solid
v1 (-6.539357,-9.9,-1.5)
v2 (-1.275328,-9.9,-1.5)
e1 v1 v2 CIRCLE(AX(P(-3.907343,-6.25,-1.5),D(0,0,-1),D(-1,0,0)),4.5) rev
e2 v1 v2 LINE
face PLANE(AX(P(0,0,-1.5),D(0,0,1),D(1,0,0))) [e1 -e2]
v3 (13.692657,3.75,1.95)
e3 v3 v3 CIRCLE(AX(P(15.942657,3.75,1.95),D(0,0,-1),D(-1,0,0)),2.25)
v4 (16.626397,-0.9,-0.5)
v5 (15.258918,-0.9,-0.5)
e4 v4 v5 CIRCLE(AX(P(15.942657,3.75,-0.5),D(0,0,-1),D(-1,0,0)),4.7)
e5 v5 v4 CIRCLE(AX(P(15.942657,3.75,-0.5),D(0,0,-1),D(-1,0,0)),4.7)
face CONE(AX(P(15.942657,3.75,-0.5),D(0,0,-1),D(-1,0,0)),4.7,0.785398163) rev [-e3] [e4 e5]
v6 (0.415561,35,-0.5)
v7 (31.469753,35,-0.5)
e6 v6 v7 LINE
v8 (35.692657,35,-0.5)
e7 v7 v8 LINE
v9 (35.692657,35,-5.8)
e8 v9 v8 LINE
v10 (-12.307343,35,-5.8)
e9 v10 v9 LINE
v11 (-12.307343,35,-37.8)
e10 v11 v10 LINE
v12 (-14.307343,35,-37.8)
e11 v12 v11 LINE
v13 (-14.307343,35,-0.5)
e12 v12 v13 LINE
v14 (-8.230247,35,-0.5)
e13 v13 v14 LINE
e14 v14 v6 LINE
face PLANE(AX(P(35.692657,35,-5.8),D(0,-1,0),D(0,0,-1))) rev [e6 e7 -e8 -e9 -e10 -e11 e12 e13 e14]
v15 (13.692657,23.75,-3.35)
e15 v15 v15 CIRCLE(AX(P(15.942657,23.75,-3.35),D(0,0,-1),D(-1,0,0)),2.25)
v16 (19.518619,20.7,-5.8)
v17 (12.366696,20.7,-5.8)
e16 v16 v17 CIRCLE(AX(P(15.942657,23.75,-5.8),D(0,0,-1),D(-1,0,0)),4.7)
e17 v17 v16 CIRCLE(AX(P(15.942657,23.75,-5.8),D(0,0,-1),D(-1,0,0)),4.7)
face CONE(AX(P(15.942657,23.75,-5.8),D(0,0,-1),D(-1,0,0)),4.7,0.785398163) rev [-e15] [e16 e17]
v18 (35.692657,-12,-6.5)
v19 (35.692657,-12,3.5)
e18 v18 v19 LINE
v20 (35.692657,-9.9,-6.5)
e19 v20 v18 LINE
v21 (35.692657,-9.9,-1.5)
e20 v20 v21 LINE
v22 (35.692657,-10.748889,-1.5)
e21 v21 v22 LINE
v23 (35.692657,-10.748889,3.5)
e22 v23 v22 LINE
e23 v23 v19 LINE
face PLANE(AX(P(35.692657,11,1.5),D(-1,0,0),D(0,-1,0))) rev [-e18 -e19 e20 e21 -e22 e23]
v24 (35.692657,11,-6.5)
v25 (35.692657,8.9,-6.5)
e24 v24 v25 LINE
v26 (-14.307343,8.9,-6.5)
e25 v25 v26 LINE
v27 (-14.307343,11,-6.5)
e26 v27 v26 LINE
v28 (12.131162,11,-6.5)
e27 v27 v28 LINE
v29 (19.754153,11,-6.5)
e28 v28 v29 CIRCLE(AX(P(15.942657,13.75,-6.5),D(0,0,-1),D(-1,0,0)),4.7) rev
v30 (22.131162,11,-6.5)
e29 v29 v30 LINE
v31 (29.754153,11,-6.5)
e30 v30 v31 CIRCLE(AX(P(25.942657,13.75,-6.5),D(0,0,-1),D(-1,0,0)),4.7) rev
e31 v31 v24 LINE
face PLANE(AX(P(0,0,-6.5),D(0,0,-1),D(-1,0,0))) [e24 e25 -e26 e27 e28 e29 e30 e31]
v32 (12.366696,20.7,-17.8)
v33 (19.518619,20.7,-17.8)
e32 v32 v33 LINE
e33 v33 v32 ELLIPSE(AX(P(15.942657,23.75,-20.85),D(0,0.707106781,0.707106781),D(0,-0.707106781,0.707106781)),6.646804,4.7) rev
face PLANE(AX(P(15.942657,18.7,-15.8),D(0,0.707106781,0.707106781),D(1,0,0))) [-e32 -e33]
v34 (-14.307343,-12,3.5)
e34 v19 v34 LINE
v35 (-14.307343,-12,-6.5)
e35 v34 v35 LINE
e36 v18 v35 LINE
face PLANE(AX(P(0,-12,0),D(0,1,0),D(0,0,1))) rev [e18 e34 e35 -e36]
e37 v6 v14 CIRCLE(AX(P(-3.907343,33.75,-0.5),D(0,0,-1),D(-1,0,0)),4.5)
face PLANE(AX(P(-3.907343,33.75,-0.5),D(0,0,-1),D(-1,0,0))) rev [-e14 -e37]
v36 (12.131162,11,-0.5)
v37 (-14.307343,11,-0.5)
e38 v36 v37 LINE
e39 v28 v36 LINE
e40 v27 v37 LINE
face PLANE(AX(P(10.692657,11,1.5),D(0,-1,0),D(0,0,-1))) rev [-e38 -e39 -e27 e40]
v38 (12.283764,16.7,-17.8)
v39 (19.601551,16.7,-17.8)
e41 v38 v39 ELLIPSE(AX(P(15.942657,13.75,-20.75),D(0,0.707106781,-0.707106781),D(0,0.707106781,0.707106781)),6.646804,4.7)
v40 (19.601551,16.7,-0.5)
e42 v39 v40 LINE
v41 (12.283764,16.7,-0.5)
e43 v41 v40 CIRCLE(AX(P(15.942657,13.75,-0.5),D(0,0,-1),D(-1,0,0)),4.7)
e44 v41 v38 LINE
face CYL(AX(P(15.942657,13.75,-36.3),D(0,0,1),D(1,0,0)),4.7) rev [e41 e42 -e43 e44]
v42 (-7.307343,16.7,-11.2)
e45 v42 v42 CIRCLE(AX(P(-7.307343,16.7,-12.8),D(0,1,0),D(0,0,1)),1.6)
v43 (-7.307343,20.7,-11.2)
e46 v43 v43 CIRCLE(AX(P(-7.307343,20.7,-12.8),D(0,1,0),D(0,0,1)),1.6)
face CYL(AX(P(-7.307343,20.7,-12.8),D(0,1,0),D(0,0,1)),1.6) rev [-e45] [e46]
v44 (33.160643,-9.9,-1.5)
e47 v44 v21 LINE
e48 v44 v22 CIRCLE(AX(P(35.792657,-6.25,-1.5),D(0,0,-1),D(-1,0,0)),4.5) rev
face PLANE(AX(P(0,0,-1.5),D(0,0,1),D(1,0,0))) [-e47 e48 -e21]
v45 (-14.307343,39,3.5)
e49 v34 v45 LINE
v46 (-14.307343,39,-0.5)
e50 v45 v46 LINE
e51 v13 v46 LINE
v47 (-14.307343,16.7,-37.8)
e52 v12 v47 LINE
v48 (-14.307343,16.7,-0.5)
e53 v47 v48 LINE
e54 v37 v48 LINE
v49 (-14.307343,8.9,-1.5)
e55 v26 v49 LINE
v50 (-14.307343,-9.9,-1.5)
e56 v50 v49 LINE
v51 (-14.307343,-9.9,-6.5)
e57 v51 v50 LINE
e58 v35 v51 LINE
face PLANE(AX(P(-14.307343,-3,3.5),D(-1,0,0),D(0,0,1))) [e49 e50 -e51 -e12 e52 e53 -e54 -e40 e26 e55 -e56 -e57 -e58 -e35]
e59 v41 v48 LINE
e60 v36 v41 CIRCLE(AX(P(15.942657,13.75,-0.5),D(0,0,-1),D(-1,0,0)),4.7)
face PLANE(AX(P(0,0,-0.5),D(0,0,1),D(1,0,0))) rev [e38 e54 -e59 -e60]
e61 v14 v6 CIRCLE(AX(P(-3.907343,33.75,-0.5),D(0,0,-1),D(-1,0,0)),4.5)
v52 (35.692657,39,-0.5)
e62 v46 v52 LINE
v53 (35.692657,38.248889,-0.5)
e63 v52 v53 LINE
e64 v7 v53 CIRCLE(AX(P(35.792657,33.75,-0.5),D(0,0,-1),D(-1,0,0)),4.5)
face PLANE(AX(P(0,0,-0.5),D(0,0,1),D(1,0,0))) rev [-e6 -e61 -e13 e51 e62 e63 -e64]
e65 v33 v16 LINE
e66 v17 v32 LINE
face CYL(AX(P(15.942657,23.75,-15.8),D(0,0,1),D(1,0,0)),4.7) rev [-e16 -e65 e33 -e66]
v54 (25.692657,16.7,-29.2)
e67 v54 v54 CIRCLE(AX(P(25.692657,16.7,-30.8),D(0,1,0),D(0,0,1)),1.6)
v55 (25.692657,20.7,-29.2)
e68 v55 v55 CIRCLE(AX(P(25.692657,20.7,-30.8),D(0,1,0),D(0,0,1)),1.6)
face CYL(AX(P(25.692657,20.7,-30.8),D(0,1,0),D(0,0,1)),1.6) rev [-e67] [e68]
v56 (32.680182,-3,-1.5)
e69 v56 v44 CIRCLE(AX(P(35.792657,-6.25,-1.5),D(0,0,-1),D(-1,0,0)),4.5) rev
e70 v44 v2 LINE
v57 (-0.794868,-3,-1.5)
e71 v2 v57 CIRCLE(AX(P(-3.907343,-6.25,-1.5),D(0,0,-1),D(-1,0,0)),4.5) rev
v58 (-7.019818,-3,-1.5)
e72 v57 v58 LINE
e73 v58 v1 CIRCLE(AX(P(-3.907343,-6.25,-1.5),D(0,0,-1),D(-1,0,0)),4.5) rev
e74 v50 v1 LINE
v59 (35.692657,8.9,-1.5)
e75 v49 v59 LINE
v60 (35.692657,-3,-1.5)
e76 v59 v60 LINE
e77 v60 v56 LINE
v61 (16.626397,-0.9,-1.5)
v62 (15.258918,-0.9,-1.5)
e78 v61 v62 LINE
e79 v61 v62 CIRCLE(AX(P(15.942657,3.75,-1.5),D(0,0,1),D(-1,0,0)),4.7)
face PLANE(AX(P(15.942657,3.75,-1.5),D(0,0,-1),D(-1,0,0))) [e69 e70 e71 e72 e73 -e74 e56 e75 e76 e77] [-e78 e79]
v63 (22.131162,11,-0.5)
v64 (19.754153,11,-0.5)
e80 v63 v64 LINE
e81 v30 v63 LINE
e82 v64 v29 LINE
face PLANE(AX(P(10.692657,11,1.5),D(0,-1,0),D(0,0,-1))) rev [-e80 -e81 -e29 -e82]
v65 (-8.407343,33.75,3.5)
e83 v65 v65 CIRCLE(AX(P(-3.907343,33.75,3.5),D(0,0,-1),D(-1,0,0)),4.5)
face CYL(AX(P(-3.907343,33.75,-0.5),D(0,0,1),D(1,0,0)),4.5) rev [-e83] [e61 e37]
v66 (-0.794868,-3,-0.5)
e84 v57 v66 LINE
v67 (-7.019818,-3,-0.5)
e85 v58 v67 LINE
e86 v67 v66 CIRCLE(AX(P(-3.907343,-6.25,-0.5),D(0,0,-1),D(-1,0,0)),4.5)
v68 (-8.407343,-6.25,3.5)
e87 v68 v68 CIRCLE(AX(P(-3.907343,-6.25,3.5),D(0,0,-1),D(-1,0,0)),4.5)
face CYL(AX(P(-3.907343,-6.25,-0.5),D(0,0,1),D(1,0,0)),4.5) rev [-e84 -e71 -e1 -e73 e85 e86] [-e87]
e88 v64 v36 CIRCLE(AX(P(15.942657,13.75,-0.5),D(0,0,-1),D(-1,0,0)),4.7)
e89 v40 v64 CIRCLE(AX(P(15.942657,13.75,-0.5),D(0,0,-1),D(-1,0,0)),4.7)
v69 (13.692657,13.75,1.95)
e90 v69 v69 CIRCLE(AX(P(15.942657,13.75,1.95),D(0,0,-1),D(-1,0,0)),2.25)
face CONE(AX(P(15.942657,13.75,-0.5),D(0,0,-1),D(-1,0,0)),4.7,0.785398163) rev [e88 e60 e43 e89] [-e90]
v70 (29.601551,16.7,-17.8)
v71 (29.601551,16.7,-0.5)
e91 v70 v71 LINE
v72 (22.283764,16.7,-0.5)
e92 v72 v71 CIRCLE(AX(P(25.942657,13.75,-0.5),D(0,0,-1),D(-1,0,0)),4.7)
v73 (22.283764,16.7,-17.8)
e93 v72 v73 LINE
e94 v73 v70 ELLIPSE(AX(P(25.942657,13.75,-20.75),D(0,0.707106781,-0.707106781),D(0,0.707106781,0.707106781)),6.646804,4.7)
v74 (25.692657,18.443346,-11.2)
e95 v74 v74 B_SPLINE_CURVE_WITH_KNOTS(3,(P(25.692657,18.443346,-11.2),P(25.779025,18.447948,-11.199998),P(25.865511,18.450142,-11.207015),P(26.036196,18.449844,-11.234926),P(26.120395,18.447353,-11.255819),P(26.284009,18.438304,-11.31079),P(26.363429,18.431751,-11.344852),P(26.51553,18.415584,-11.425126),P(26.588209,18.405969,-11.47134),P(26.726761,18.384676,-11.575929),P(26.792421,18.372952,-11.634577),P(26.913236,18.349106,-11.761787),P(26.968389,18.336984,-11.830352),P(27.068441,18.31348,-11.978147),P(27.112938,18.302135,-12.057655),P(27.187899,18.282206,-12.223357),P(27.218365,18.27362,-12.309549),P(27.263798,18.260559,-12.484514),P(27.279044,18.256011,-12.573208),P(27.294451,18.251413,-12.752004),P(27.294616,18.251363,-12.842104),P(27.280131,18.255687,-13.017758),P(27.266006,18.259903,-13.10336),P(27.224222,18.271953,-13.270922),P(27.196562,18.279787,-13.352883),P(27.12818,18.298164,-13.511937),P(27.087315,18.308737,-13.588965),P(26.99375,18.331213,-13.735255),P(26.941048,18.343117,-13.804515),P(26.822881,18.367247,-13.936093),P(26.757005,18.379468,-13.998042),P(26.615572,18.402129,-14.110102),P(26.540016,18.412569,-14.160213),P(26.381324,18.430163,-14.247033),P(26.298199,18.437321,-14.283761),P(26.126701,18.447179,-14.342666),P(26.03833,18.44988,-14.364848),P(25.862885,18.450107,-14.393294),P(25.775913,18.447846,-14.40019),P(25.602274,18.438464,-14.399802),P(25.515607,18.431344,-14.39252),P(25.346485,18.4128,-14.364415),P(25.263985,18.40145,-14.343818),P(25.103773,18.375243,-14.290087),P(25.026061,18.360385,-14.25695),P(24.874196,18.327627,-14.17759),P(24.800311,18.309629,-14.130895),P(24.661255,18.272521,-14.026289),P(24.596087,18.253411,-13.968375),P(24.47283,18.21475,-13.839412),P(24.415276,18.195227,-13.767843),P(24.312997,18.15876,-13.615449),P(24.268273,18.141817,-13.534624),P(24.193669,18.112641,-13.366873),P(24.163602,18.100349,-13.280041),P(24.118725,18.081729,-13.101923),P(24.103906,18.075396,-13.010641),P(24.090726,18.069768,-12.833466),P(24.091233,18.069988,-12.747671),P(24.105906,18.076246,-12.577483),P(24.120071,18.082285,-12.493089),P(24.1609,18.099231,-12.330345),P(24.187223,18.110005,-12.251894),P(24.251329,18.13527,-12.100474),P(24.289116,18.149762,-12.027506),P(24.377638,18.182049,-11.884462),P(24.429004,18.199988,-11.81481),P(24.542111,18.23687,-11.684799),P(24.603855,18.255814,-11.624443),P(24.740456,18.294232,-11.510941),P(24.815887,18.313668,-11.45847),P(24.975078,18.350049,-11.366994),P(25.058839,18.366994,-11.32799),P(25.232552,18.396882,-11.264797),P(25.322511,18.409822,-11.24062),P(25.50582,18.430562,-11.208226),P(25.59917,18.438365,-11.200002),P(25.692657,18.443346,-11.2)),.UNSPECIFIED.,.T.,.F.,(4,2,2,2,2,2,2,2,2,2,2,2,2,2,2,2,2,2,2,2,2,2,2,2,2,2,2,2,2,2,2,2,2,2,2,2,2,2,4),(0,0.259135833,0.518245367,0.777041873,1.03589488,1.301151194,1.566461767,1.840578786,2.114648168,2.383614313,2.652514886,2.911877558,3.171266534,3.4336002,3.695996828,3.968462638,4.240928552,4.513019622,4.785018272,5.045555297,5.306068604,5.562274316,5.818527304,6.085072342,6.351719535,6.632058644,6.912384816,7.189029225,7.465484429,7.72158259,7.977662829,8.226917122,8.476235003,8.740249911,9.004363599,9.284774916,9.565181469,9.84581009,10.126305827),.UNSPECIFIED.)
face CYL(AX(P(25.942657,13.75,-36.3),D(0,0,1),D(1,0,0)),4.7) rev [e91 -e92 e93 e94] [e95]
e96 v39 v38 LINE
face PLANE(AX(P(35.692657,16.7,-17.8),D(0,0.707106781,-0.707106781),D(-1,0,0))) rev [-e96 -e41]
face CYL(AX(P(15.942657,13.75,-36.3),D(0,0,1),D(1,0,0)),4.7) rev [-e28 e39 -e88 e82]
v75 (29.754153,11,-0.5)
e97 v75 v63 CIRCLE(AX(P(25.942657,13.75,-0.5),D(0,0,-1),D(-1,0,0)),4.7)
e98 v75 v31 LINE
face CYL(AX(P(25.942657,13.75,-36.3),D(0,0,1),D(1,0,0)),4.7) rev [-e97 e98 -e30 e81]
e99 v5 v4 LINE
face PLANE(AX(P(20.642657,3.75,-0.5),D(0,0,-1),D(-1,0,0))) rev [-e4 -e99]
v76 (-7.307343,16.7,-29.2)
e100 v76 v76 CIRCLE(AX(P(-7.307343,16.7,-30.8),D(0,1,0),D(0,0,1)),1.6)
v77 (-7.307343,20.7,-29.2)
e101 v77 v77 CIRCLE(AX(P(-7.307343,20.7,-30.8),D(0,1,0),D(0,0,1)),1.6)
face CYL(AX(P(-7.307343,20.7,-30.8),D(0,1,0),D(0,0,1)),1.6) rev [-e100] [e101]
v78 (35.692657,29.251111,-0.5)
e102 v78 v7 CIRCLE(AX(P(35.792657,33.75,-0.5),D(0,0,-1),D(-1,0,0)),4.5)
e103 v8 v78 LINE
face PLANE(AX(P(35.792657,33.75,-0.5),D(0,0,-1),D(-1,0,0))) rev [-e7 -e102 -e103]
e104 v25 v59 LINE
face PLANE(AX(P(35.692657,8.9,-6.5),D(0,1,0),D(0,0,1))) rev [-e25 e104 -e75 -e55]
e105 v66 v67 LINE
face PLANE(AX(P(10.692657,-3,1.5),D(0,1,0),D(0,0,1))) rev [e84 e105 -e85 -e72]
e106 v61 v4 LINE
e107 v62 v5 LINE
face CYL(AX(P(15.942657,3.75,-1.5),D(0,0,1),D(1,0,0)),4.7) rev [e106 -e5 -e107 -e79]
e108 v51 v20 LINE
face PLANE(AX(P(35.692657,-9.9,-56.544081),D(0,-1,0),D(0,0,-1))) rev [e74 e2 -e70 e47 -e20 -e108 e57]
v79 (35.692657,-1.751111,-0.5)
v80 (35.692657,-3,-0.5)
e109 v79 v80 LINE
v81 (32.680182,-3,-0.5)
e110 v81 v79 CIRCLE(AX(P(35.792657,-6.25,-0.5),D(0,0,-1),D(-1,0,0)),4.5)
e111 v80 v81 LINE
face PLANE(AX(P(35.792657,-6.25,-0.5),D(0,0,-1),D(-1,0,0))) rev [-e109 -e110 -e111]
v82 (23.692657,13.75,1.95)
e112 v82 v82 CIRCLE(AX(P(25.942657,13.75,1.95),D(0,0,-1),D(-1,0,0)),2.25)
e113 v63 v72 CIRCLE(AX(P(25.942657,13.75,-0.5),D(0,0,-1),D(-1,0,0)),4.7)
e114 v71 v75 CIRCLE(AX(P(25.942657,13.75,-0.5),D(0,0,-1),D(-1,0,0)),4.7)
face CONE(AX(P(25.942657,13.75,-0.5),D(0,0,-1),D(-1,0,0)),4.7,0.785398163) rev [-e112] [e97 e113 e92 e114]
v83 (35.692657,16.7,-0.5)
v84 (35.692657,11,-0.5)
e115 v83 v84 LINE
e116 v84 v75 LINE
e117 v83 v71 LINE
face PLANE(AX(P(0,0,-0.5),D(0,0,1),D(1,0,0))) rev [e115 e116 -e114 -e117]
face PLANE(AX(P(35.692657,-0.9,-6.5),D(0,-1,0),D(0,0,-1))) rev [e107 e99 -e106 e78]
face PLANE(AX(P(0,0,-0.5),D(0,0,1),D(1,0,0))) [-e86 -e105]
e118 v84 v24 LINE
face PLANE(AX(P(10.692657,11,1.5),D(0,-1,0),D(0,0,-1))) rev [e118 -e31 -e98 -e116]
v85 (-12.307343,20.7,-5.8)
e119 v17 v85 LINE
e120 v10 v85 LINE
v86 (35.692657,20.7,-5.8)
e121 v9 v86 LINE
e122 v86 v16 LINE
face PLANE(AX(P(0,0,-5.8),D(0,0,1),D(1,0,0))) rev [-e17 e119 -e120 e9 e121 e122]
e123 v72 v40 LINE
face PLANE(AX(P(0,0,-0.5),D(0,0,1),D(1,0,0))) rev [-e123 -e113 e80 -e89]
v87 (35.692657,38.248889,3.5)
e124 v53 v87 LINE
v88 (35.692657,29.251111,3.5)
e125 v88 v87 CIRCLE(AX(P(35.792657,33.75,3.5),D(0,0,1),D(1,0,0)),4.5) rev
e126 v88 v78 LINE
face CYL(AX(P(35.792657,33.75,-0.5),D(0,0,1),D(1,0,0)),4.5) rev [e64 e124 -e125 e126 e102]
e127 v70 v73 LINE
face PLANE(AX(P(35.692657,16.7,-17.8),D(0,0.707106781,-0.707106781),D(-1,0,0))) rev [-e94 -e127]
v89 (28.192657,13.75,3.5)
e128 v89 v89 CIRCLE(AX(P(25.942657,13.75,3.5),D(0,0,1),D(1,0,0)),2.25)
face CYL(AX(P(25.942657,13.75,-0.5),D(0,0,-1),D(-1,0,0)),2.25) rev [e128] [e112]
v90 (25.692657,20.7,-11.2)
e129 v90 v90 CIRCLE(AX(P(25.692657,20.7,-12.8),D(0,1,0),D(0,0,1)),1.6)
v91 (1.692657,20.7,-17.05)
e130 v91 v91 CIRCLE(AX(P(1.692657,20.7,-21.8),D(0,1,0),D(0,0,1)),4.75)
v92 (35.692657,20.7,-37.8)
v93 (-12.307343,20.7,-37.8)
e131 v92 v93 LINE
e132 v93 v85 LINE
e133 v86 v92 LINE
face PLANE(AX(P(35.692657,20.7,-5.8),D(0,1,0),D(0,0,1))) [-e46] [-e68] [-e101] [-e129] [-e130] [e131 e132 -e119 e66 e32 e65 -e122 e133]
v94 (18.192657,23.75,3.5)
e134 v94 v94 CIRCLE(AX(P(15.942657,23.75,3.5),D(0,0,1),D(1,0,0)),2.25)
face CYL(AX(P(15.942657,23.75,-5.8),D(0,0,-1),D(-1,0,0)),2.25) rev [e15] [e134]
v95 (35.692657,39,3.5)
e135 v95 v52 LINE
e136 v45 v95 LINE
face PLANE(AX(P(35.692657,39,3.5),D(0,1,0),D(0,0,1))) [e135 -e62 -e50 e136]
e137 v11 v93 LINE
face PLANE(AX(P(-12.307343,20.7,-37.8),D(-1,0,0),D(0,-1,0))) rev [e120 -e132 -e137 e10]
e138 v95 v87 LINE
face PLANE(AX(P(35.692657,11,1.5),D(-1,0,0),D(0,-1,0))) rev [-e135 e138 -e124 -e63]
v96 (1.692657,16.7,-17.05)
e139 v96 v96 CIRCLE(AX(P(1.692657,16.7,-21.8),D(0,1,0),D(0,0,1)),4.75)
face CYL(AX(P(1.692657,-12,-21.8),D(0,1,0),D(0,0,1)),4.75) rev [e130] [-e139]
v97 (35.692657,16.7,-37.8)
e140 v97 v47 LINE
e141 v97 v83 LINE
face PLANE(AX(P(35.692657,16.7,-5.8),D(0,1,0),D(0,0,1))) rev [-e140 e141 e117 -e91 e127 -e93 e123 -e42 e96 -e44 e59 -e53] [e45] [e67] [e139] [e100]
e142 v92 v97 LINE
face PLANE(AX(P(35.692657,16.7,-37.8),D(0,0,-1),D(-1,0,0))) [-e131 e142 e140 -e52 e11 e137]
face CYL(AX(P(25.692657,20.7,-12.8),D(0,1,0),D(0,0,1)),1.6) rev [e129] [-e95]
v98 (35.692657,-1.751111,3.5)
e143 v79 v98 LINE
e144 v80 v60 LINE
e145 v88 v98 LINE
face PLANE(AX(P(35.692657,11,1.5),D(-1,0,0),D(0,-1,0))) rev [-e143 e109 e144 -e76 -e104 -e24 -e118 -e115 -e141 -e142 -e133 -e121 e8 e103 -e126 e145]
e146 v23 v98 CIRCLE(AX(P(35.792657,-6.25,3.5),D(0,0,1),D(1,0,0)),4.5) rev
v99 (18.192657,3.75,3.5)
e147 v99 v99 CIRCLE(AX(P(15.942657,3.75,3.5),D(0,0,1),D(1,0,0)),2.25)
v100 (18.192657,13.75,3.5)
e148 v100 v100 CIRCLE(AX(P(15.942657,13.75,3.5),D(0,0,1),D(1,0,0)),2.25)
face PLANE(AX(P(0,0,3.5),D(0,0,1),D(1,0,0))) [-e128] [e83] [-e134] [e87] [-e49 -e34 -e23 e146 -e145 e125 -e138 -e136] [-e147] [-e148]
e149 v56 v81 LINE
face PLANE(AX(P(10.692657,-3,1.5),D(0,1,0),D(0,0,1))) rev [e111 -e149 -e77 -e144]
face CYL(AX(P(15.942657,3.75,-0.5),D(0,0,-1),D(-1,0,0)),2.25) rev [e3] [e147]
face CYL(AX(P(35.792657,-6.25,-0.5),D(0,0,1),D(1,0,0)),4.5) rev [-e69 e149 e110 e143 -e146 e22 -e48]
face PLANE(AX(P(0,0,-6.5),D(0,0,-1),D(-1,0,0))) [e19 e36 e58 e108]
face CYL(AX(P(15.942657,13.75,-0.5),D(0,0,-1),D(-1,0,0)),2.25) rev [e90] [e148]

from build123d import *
from build123d.topology import SkipClean

# Parameters (mm, degrees)
BOSS_EXTRUDE1_START       = 0.5
SKETCH1_W                 = 25
SKETCH1_H                 = 14
BOSS_EXTRUDE1_DEPTH       = 2
SKETCH2_W                 = 25
SKETCH2_H                 = 2.1
BOSS_EXTRUDE2_DEPTH       = 6
SKETCH3_W                 = 50
SKETCH3_H                 = 42
BOSS_EXTRUDE3_DEPTH       = 4
BOSS_EXTRUDE5_START       = -18.3
SKETCH4_2_R               = 1.5
BOSS_EXTRUDE5_DEPTH       = 4
SKETCH5_W                 = 50
SKETCH5_H                 = 18.3
BOSS_EXTRUDE6_DEPTH       = 5.3
SKETCH24_W                = 50
SKETCH24_H                = 4
BOSS_EXTRUDE13_DEPTH      = 9
SKETCH7_R                 = 4.5
CUT_EXTRUDE1_DEPTH        = 4
SKETCH9_W                 = 35.343646405
SKETCH9_H                 = 8.813303651
CUT_EXTRUDE3_DEPTH        = 10
SKETCH11_R                = 12.5
SKETCH11_R_2              = 1.5
SKETCH11_R_3              = 3.55
BOSS_EXTRUDE7_DEPTH       = 4
SKETCH12_R                = 12.5
BOSS_EXTRUDE8_DEPTH       = 14
SKETCH13_W                = 25
SKETCH13_H                = 2.1
BOSS_EXTRUDE9_DEPTH       = 6
CUT_EXTRUDE2_DEPTH        = 64.84830294
SKETCH14_W                = 9.591087042
SKETCH14_H                = 22.957747356
CUT_EXTRUDE4_DEPTH        = 70.083614523
SKETCH15_W                = 33.975925545
SKETCH15_H                = 18.244219276
CUT_EXTRUDE5_DEPTH        = 62.391693358
SKETCH16_W                = 32
SKETCH16_H                = 4
BOSS_EXTRUDE10_DEPTH      = 50
SKETCH18_W                = 2
SKETCH18_H                = 14.3
BOSS_EXTRUDE11_DEPTH      = 32
CUT_EXTRUDE6_DEPTH        = 62.41738995
F_1_0MM_DOWEL_HOLE1_D     = 3.2
F_1_0MM_DOWEL_HOLE1_DEPTH = 33.03862301
F_1_0MM_DOWEL_HOLE1_TIP   = 0.96137699
BOSS_EXTRUDE12_DEPTH      = 1
CUT_EXTRUDE7_DEPTH        = 10
CHAMFER1_SIZE             = 2
CUT_EXTRUDE8_DEPTH        = 10
BOSS_EXTRUDE14_DEPTH      = 1
SKETCH26_W                = 50
SKETCH26_H                = 2.1
BOSS_EXTRUDE15_DEPTH      = 5


# Read off the part's stored shape, not the designer's step: CSK for M4 Flat Head Machine Screw1
with BuildPart() as part:
    # Sketch1 → Boss-Extrude1 (new body)
    with BuildSketch(Plane.XY.offset(-1).offset(BOSS_EXTRUDE1_START)):
        with Locations((23.192657344, 4)):
            Rectangle(SKETCH1_W, SKETCH1_H)
    extrude(amount=BOSS_EXTRUDE1_DEPTH)

    # Sketch2 → Boss-Extrude2 (add)
    with BuildSketch(Plane(origin=(0, 0, -0.5), x_dir=(-1, 0, 0), z_dir=(0, 0, -1))):
        with Locations((-23.192657344, 9.95)):
            Rectangle(SKETCH2_W, SKETCH2_H)
        with Locations((-23.192657344, -1.95)):
            Rectangle(SKETCH2_W, SKETCH2_H)
    extrude(amount=BOSS_EXTRUDE2_DEPTH)

    # Sketch3 → Boss-Extrude3 (add)
    with BuildSketch(Plane(origin=(0, 0, -0.5), x_dir=(-1, 0, 0), z_dir=(0, 0, -1))):
        with Locations((-10.692657344, 18)):
            Rectangle(SKETCH3_W, SKETCH3_H)
    extrude(amount=-BOSS_EXTRUDE3_DEPTH)

    # Sketch4<2> → Boss-Extrude5 (add)
    with BuildSketch(Plane(origin=(0, 35, 0), x_dir=(1, 0, 0), z_dir=(0, 1, 0)).offset(BOSS_EXTRUDE5_START)):
        with BuildLine():
            Line((-1.349302764, 24.5), (-1.349302764, 0.5))
            Line((-1.349302764, 0.5), (8.650697236, 0.5))
            Line((8.650697236, 0.5), (8.650697236, 24.5))
            ThreePointArc((8.650697236, 24.5), (3.650697236, 29.5), (-1.349302764, 24.5))
        make_face()
        with Locations(Location((3.650697236, 7.5, 0), (0, 0, 270))):
            Circle(SKETCH4_2_R, mode=Mode.SUBTRACT)
        with Locations(Location((3.650697236, 24.5, 0), (0, 0, 270))):
            Circle(SKETCH4_2_R, mode=Mode.SUBTRACT)
    extrude(amount=-BOSS_EXTRUDE5_DEPTH)

    # Sketch5 → Boss-Extrude6 (add)
    with BuildSketch(Plane(origin=(0, 0, -0.5), x_dir=(-1, 0, 0), z_dir=(0, 0, -1))):
        with Locations((-10.692657344, 25.85)):
            Rectangle(SKETCH5_W, SKETCH5_H)
    extrude(amount=BOSS_EXTRUDE6_DEPTH)

    # CSK for M4 Flat Head Machine Screw1 outl → CSK for M4 Flat Head Machine Screw1 (revolve, cut)
    with BuildSketch(Plane(origin=(15.942657344, 23.75, 0), x_dir=(1, 0, 0), z_dir=(0, -1, 0))):
        Polygon((2.25, -3.35), (2.25, 3.5), (0, 3.5), (0, -5.8), (4.7, -5.8), align=None)
    revolve(axis=Axis((15.942657344, 23.75, 0), (0, 0, 1)), mode=Mode.SUBTRACT)

    # CSK for M4 Flat Head Machine Screw1 2 ou → CSK for M4 Flat Head Machine Screw1 2 (revolve, cut)
    with BuildSketch(Plane(origin=(15.942657344, 3.75, 0), x_dir=(1, 0, 0), z_dir=(0, -1, 0))):
        Polygon((4.7, -0.5), (2.25, 1.95), (2.25, 3.5), (0, 3.5), (0, -0.5), align=None)
    revolve(axis=Axis((15.942657344, 3.75, 0), (0, 0, 1)), mode=Mode.SUBTRACT)

    # CSK for M4 Flat Head Machine Screw1 3 ou → CSK for M4 Flat Head Machine Screw1 3 (revolve, cut)
    with BuildSketch(Plane(origin=(15.942657344, 13.75, 0), x_dir=(1, 0, 0), z_dir=(0, -1, 0))):
        Polygon((4.7, -0.5), (2.25, 1.95), (2.25, 3.5), (0, 3.5), (0, -0.5), align=None)
    revolve(axis=Axis((15.942657344, 13.75, 0), (0, 0, 1)), mode=Mode.SUBTRACT)

    # CSK for M4 Flat Head Machine Screw1 4 ou → CSK for M4 Flat Head Machine Screw1 4 (revolve, cut)
    with BuildSketch(Plane(origin=(25.942657344, 13.75, 0), x_dir=(1, 0, 0), z_dir=(0, -1, 0))):
        Polygon((2.25, 1.95), (2.25, 3.5), (0, 3.5), (0, -0.5), (4.7, -0.5), align=None)
    revolve(axis=Axis((25.942657344, 13.75, 0), (0, 0, 1)), mode=Mode.SUBTRACT)

    # Sketch24 → Boss-Extrude13 (add)
    with BuildSketch(Plane.XZ.offset(3)):
        with Locations((10.692657344, 1.5)):
            Rectangle(SKETCH24_W, SKETCH24_H)
    extrude(amount=BOSS_EXTRUDE13_DEPTH)

    # Sketch7 → Cut-Extrude1 (cut)
    with BuildSketch(Plane(origin=(0, 0, 3.5), x_dir=(-1, 0, 0), z_dir=(0, 0, -1))):
        with Locations((-35.792657344, 33.75)):
            Circle(SKETCH7_R)
        with Locations(Location((3.907342656, 33.75, 0), (0, 0, 163.872379787))):
            Circle(SKETCH7_R)
        with Locations((3.907342656, -6.25)):
            Circle(SKETCH7_R)
        with Locations((-35.792657344, -6.25)):
            Circle(SKETCH7_R)
    extrude(amount=CUT_EXTRUDE1_DEPTH, mode=Mode.SUBTRACT)

    # Sketch9 → Cut-Extrude3 (cut)
    with BuildSketch(Plane.ZY.offset(1.349302764)):
        with Locations((-18.171823203, 12.293348175)):
            Rectangle(SKETCH9_W, SKETCH9_H)
    extrude(amount=-CUT_EXTRUDE3_DEPTH, mode=Mode.SUBTRACT)

    # Sketch11 → Boss-Extrude7 (add)
    # profile 1 of 4: a face of its own
    with BuildSketch(Plane.XZ.offset(-16.7)):
        with BuildLine():
            Line((-3.212467494, -5.8), (-14.307342656, -5.8))
            Line((-14.307342656, -5.8), (-14.807342656, -5.8))
            Line((-14.807342656, -5.8), (-14.807342656, -20.8))
            ThreePointArc((-14.807342656, -20.8), (-11.570691199, -11.320533638), (-3.212467494, -5.8))
        make_face()
    # profile 2 of 4: a face of its own
    with BuildSketch(Plane.XZ.offset(-16.7)):
        with BuildLine():
            Line((4.597782182, -5.8), (-3.212467494, -5.8))
            ThreePointArc((-3.212467494, -5.8), (-11.570691199, -11.320533638), (-14.807342656, -20.8))
            ThreePointArc((-14.807342656, -20.8), (0.692657344, -36.3), (16.192657344, -20.8))
            ThreePointArc((16.192657344, -20.8), (12.956005887, -11.320533638), (4.597782182, -5.8))
        make_face()
        with Locations((0.692657344, -20.8)):
            Circle(SKETCH11_R, mode=Mode.SUBTRACT)
    # profile 3 of 4: a face of its own
    with BuildSketch(Plane.XZ.offset(-16.7)):
        with Locations((0.692657344, -20.8)):
            Circle(SKETCH11_R)
        with Locations(Location((0.692657344, -12.3, 0), (0, 0, 270))):
            Circle(SKETCH11_R_2, mode=Mode.SUBTRACT)
        with Locations(Location((0.692657344, -20.8, 0), (0, 0, 270))):
            Circle(SKETCH11_R_3, mode=Mode.SUBTRACT)
        with Locations(Location((9.192657344, -20.8, 0), (0, 0, 270))):
            Circle(SKETCH11_R_2, mode=Mode.SUBTRACT)
        with Locations(Location((0.692657344, -29.3, 0), (0, 0, 270))):
            Circle(SKETCH11_R_2, mode=Mode.SUBTRACT)
        with Locations(Location((-7.807342656, -20.8, 0), (0, 0, 270))):
            Circle(SKETCH11_R_2, mode=Mode.SUBTRACT)
    # profile 4 of 4: a face of its own
    with BuildSketch(Plane.XZ.offset(-16.7)):
        with BuildLine():
            Line((16.192657344, -5.8), (4.597782182, -5.8))
            ThreePointArc((4.597782182, -5.8), (12.956005887, -11.320533638), (16.192657344, -20.8))
            Line((16.192657344, -20.8), (16.192657344, -5.8))
        make_face()
    extrude(amount=-BOSS_EXTRUDE7_DEPTH)

    # Sketch12 → Boss-Extrude8 (add)
    with SkipClean():  # the faces are left unmerged after this step: merging them gives an invalid solid
        with BuildSketch(Plane(origin=(0, 20.7, 0), x_dir=(1, 0, 0), z_dir=(0, 1, 0))):
            with BuildLine():
                Line((-14.807342656, 20.8), (-14.807342656, 5.8))
                Line((-14.807342656, 5.8), (16.192657344, 5.8))
                Line((16.192657344, 5.8), (16.192657344, 20.8))
                ThreePointArc((16.192657344, 20.8), (0.692657344, 36.3), (-14.807342656, 20.8))
            make_face()
            with Locations(Location((0.692657344, 20.8, 0), (0, 0, 270))):
                Circle(SKETCH12_R, mode=Mode.SUBTRACT)
        extrude(amount=BOSS_EXTRUDE8_DEPTH)

    # Sketch13 → Boss-Extrude9 (add)
    with SkipClean():  # the faces are left unmerged after this step: merging them gives an invalid solid
        with BuildSketch(Plane(origin=(0, 0, -0.5), x_dir=(-1, 0, 0), z_dir=(0, 0, -1))):
            with Locations((1.807342656, 9.95)):
                Rectangle(SKETCH13_W, SKETCH13_H)
            with Locations((1.807342656, -1.95)):
                Rectangle(SKETCH13_W, SKETCH13_H)
        extrude(amount=BOSS_EXTRUDE9_DEPTH)

    # Sketch8 → Cut-Extrude2 (cut, through all)
    with SkipClean():  # the faces are left unmerged after this step: merging them gives an invalid solid
        with BuildSketch(Plane(origin=(0, 0, -0.5), x_dir=(-1, 0, 0), z_dir=(0, 0, -1))):
            with BuildLine():
                ThreePointArc((-12.283764069, 16.7), (-15.942657344, 18.45), (-19.601550619, 16.7))
                ThreePointArc((-19.601550619, 16.7), (-20.640973864, 13.875785056), (-19.754153113, 11))
                ThreePointArc((-19.754153113, 11), (-15.942657344, 9.05), (-12.131161575, 11))
                ThreePointArc((-12.131161575, 11), (-11.244340824, 13.875785056), (-12.283764069, 16.7))
            make_face()
            with BuildLine():
                ThreePointArc((-22.283764069, 16.7), (-25.942657344, 18.45), (-29.601550619, 16.7))
                ThreePointArc((-29.601550619, 16.7), (-30.640973864, 13.875785056), (-29.754153113, 11))
                ThreePointArc((-29.754153113, 11), (-25.942657344, 9.05), (-22.131161575, 11))
                ThreePointArc((-22.131161575, 11), (-21.244340824, 13.875785056), (-22.283764069, 16.7))
            make_face()
        extrude(amount=CUT_EXTRUDE2_DEPTH, mode=Mode.SUBTRACT)

    # Sketch14 → Cut-Extrude4 (cut, through all)
    with SkipClean():  # the faces are left unmerged after this step: merging them gives an invalid solid
        with BuildSketch(Plane(origin=(0, 34.7, 0), x_dir=(1, 0, 0), z_dir=(0, 1, 0))):
            with Locations((-19.102886177, 17.278873678)):
                Rectangle(SKETCH14_W, SKETCH14_H)
        extrude(amount=-CUT_EXTRUDE4_DEPTH, mode=Mode.SUBTRACT)

    # Sketch15 → Cut-Extrude5 (cut, through all)
    with BuildSketch(Plane(origin=(16.192657344, 0, 0), x_dir=(0, 0, -1), z_dir=(1, 0, 0))):
        with Locations((22.787962773, 25.822109638)):
            Rectangle(SKETCH15_W, SKETCH15_H)
    extrude(amount=-CUT_EXTRUDE5_DEPTH, mode=Mode.SUBTRACT)

    # Sketch16 → Boss-Extrude10 (add, through all)
    with BuildSketch(Plane.ZY.offset(14.307342656)):
        with Locations((-21.8, 18.7)):
            Rectangle(SKETCH16_W, SKETCH16_H)
    extrude(amount=-BOSS_EXTRUDE10_DEPTH)

    # Sketch18 → Boss-Extrude11 (add, through all)
    with BuildSketch(Plane(origin=(0, 0, -5.8), x_dir=(-1, 0, 0), z_dir=(0, 0, -1))):
        with Locations((13.307342656, 27.85)):
            Rectangle(SKETCH18_W, SKETCH18_H)
    extrude(amount=BOSS_EXTRUDE11_DEPTH)

    # Sketch19 → Cut-Extrude6 (cut, through all)
    with BuildSketch(Plane(origin=(0, 20.7, 0), x_dir=(1, 0, 0), z_dir=(0, 1, 0))):
        with BuildLine():
            ThreePointArc((3.376188065, 17.358353423), (6.134303921, 23.483530721), (0.009126623, 26.241646577))
            ThreePointArc((0.009126623, 26.241646577), (-2.748989233, 20.116469279), (3.376188065, 17.358353423))
        make_face()
    extrude(amount=-CUT_EXTRUDE6_DEPTH, mode=Mode.SUBTRACT)

    # Ø1.0mm Dowel Hole1
    with Locations(Plane(origin=(-7.307342656, 20.7, -30.8), x_dir=(0, 0, 1), z_dir=(0, 1, 0))):
        with Locations((0, 0), (18, 0), (18, 33), (0, 33)):
            Hole(F_1_0MM_DOWEL_HOLE1_D / 2, depth=F_1_0MM_DOWEL_HOLE1_DEPTH)
            with Locations((0, 0, -(F_1_0MM_DOWEL_HOLE1_DEPTH + F_1_0MM_DOWEL_HOLE1_TIP / 2))):  # 118° drill point
                Cone(0, F_1_0MM_DOWEL_HOLE1_D / 2, F_1_0MM_DOWEL_HOLE1_TIP, mode=Mode.SUBTRACT)

    # Sketch21 → Boss-Extrude12 (add)
    with BuildSketch(Plane(origin=(0, 0, -0.5), x_dir=(-1, 0, 0), z_dir=(0, 0, -1))):
        with BuildLine():
            Line((-15.258917627, -0.9), (14.307342656, -0.9))
            Line((14.307342656, -0.9), (14.307342656, 8.9))
            Line((14.307342656, 8.9), (-35.692657344, 8.9))
            Line((-35.692657344, 8.9), (-35.692657344, -0.9))
            Line((-35.692657344, -0.9), (-16.626397061, -0.9))
            ThreePointArc((-16.626397061, -0.9), (-15.942657344, 8.45), (-15.258917627, -0.9))
        make_face()
    extrude(amount=BOSS_EXTRUDE12_DEPTH)

    # Sketch22 → Cut-Extrude7 (cut)
    with BuildSketch(Plane(origin=(0, 0, -5.8), x_dir=(-1, 0, 0), z_dir=(0, 0, -1))):
        with BuildLine():
            ThreePointArc((-22.283764069, 16.7), (-25.942657344, 18.45), (-29.601550619, 16.7))
            ThreePointArc((-29.601550619, 16.7), (-30.640973864, 13.875785056), (-29.754153113, 11))
            ThreePointArc((-29.754153113, 11), (-25.942657344, 9.05), (-22.131161575, 11))
            ThreePointArc((-22.131161575, 11), (-21.244340824, 13.875785056), (-22.283764069, 16.7))
        make_face()
        with BuildLine():
            ThreePointArc((-12.283764069, 16.7), (-15.942657344, 18.45), (-19.601550619, 16.7))
            ThreePointArc((-19.601550619, 16.7), (-20.640973864, 13.875785056), (-19.754153113, 11))
            ThreePointArc((-19.754153113, 11), (-15.942657344, 9.05), (-12.131161575, 11))
            ThreePointArc((-12.131161575, 11), (-11.244340824, 13.875785056), (-12.283764069, 16.7))
        make_face()
        with BuildLine():
            ThreePointArc((-19.518618753, 20.7), (-15.942657344, 19.05), (-12.366695935, 20.7))
            ThreePointArc((-12.366695935, 20.7), (-15.942657344, 28.45), (-19.518618753, 20.7))
        make_face()
    extrude(amount=CUT_EXTRUDE7_DEPTH, mode=Mode.SUBTRACT)

    # Chamfer1
    # the kernel refuses this chamfer: 2 mm, written as the material it takes off along each edge
    with BuildSketch(Plane(origin=(7.223329959, 20.7, -15.8), x_dir=(0, -0.9996219169112968, 0.02749587661058651), z_dir=(1, 0, 0))) as chamfer1_piece_1_section:
        Polygon((CHAMFER1_SIZE * 0.999621916911, CHAMFER1_SIZE * 0.0274958766106), (-CHAMFER1_SIZE * 0.0274958766106, CHAMFER1_SIZE * 0.999621916911), (0, 0), align=None)
    chamfer1_piece_1 = extrude(amount=17.43865477, mode=Mode.PRIVATE)
    chamfer1_piece_1 = chamfer1_piece_1 & Plane(origin=(15.942657344, 23.75, -16.543684423), x_dir=(0.7608428530186694, -0.6489361702127657, 0), z_dir=(0, 0, 1)) * Cylinder(4.7, 43, mode=Mode.PRIVATE)
    add(chamfer1_piece_1, mode=Mode.SUBTRACT)
    with BuildSketch(Plane(origin=(24.744916595, 16.7, -15.8), x_dir=(0, 0.9996219169112968, 0.02749587661058651), z_dir=(-1, 0, 0))) as chamfer1_piece_2_section:
        Polygon((CHAMFER1_SIZE * 0.999621916911, CHAMFER1_SIZE * 0.0274958766106), (-CHAMFER1_SIZE * 0.0274958766106, CHAMFER1_SIZE * 0.999621916911), (0, 0), align=None)
    chamfer1_piece_2 = extrude(amount=17.604518502, mode=Mode.PRIVATE)
    chamfer1_piece_2 = chamfer1_piece_2 & Plane(origin=(25.942657344, 13.75, -16.56864212), x_dir=(-0.8109565466765494, -0.5851063829787245, 0), z_dir=(0, 0, 1)) * Cylinder(4.7, 44, mode=Mode.PRIVATE)
    add(chamfer1_piece_2, mode=Mode.SUBTRACT)
    with BuildSketch(Plane(origin=(24.744916595, 16.7, -15.8), x_dir=(0, 0.9996219169112968, 0.02749587661058651), z_dir=(-1, 0, 0))) as chamfer1_piece_3_section:
        Polygon((CHAMFER1_SIZE * 0.999621916911, CHAMFER1_SIZE * 0.0274958766106), (-CHAMFER1_SIZE * 0.0274958766106, CHAMFER1_SIZE * 0.999621916911), (0, 0), align=None)
    chamfer1_piece_3 = extrude(amount=17.604518502, mode=Mode.PRIVATE)
    chamfer1_piece_3 = chamfer1_piece_3 & Plane(origin=(15.942657344, 13.75, -16.53312589), x_dir=(-0.7784879309138604, 0.6276595744680842, 0), z_dir=(0, 0, 1)) * Cylinder(4.7, 44, mode=Mode.PRIVATE)
    add(chamfer1_piece_3, mode=Mode.SUBTRACT)
    with BuildSketch(Plane(origin=(34.744916595, 16.7, -15.8), x_dir=(0, 0.9996219169112968, 0.02749587661058651), z_dir=(-1, 0, 0))) as chamfer1_piece_4_section:
        Polygon((CHAMFER1_SIZE * 0.999621916911, CHAMFER1_SIZE * 0.0274958766106), (-CHAMFER1_SIZE * 0.0274958766106, CHAMFER1_SIZE * 0.999621916911), (0, 0), align=None)
    chamfer1_piece_4 = extrude(amount=17.604518502, mode=Mode.PRIVATE)
    chamfer1_piece_4 = chamfer1_piece_4 & Plane(origin=(25.942657344, 13.75, -16.533125893), x_dir=(-0.8109565466765494, -0.5851063829787245, 0), z_dir=(0, 0, 1)) * Cylinder(4.7, 44, mode=Mode.PRIVATE)
    add(chamfer1_piece_4, mode=Mode.SUBTRACT)
    with BuildSketch(Plane(origin=(34.744916595, 16.7, -15.8), x_dir=(0, 0.9996219169112968, 0.02749587661058651), z_dir=(-1, 0, 0))) as chamfer1_piece_5_section:
        Polygon((CHAMFER1_SIZE * 0.999621916911, CHAMFER1_SIZE * 0.0274958766106), (-CHAMFER1_SIZE * 0.0274958766106, CHAMFER1_SIZE * 0.999621916911), (0, 0), align=None)
    chamfer1_piece_5 = extrude(amount=17.604518502, mode=Mode.PRIVATE)
    chamfer1_piece_5 = chamfer1_piece_5 & Plane(origin=(15.942657344, 13.75, -16.568642119), x_dir=(-0.7784879309138604, 0.6276595744680842, 0), z_dir=(0, 0, 1)) * Cylinder(4.7, 44, mode=Mode.PRIVATE)
    add(chamfer1_piece_5, mode=Mode.SUBTRACT)

    # Sketch23 → Cut-Extrude8 (cut)
    with BuildSketch(Plane.XZ.offset(3)):
        Polygon((35.692657344, -1.5), (16.626397061, -1.5), (15.258917627, -1.5), (-14.307342656, -1.5), (-14.307342656, -6.5), (35.692657344, -6.5), align=None)
    extrude(amount=-CUT_EXTRUDE8_DEPTH, mode=Mode.SUBTRACT)

    # Sketch25 → Boss-Extrude14 (add)
    with BuildSketch(Plane(origin=(0, 0, -0.5), x_dir=(-1, 0, 0), z_dir=(0, 0, -1))):
        with BuildLine():
            Line((0.794867757, -3), (-32.680182444, -3))
            ThreePointArc((-32.680182444, -3), (-31.598456828, -7.880546544), (-35.692657344, -10.748888752))
            Line((-35.692657344, -10.748888752), (-35.692657344, -12))
            Line((-35.692657344, -12), (14.307342656, -12))
            Line((14.307342656, -12), (14.307342656, -3))
            Line((14.307342656, -3), (7.019817556, -3))
            ThreePointArc((7.019817556, -3), (3.907342656, -10.75), (0.794867757, -3))
        make_face()
    extrude(amount=BOSS_EXTRUDE14_DEPTH)

    # Sketch26 → Boss-Extrude15 (add)
    with BuildSketch(Plane(origin=(0, 0, -1.5), x_dir=(-1, 0, 0), z_dir=(0, 0, -1))):
        with Locations((-10.692657344, -10.95)):
            Rectangle(SKETCH26_W, SKETCH26_H)
    extrude(amount=BOSS_EXTRUDE15_DEPTH)


solid = part.part
